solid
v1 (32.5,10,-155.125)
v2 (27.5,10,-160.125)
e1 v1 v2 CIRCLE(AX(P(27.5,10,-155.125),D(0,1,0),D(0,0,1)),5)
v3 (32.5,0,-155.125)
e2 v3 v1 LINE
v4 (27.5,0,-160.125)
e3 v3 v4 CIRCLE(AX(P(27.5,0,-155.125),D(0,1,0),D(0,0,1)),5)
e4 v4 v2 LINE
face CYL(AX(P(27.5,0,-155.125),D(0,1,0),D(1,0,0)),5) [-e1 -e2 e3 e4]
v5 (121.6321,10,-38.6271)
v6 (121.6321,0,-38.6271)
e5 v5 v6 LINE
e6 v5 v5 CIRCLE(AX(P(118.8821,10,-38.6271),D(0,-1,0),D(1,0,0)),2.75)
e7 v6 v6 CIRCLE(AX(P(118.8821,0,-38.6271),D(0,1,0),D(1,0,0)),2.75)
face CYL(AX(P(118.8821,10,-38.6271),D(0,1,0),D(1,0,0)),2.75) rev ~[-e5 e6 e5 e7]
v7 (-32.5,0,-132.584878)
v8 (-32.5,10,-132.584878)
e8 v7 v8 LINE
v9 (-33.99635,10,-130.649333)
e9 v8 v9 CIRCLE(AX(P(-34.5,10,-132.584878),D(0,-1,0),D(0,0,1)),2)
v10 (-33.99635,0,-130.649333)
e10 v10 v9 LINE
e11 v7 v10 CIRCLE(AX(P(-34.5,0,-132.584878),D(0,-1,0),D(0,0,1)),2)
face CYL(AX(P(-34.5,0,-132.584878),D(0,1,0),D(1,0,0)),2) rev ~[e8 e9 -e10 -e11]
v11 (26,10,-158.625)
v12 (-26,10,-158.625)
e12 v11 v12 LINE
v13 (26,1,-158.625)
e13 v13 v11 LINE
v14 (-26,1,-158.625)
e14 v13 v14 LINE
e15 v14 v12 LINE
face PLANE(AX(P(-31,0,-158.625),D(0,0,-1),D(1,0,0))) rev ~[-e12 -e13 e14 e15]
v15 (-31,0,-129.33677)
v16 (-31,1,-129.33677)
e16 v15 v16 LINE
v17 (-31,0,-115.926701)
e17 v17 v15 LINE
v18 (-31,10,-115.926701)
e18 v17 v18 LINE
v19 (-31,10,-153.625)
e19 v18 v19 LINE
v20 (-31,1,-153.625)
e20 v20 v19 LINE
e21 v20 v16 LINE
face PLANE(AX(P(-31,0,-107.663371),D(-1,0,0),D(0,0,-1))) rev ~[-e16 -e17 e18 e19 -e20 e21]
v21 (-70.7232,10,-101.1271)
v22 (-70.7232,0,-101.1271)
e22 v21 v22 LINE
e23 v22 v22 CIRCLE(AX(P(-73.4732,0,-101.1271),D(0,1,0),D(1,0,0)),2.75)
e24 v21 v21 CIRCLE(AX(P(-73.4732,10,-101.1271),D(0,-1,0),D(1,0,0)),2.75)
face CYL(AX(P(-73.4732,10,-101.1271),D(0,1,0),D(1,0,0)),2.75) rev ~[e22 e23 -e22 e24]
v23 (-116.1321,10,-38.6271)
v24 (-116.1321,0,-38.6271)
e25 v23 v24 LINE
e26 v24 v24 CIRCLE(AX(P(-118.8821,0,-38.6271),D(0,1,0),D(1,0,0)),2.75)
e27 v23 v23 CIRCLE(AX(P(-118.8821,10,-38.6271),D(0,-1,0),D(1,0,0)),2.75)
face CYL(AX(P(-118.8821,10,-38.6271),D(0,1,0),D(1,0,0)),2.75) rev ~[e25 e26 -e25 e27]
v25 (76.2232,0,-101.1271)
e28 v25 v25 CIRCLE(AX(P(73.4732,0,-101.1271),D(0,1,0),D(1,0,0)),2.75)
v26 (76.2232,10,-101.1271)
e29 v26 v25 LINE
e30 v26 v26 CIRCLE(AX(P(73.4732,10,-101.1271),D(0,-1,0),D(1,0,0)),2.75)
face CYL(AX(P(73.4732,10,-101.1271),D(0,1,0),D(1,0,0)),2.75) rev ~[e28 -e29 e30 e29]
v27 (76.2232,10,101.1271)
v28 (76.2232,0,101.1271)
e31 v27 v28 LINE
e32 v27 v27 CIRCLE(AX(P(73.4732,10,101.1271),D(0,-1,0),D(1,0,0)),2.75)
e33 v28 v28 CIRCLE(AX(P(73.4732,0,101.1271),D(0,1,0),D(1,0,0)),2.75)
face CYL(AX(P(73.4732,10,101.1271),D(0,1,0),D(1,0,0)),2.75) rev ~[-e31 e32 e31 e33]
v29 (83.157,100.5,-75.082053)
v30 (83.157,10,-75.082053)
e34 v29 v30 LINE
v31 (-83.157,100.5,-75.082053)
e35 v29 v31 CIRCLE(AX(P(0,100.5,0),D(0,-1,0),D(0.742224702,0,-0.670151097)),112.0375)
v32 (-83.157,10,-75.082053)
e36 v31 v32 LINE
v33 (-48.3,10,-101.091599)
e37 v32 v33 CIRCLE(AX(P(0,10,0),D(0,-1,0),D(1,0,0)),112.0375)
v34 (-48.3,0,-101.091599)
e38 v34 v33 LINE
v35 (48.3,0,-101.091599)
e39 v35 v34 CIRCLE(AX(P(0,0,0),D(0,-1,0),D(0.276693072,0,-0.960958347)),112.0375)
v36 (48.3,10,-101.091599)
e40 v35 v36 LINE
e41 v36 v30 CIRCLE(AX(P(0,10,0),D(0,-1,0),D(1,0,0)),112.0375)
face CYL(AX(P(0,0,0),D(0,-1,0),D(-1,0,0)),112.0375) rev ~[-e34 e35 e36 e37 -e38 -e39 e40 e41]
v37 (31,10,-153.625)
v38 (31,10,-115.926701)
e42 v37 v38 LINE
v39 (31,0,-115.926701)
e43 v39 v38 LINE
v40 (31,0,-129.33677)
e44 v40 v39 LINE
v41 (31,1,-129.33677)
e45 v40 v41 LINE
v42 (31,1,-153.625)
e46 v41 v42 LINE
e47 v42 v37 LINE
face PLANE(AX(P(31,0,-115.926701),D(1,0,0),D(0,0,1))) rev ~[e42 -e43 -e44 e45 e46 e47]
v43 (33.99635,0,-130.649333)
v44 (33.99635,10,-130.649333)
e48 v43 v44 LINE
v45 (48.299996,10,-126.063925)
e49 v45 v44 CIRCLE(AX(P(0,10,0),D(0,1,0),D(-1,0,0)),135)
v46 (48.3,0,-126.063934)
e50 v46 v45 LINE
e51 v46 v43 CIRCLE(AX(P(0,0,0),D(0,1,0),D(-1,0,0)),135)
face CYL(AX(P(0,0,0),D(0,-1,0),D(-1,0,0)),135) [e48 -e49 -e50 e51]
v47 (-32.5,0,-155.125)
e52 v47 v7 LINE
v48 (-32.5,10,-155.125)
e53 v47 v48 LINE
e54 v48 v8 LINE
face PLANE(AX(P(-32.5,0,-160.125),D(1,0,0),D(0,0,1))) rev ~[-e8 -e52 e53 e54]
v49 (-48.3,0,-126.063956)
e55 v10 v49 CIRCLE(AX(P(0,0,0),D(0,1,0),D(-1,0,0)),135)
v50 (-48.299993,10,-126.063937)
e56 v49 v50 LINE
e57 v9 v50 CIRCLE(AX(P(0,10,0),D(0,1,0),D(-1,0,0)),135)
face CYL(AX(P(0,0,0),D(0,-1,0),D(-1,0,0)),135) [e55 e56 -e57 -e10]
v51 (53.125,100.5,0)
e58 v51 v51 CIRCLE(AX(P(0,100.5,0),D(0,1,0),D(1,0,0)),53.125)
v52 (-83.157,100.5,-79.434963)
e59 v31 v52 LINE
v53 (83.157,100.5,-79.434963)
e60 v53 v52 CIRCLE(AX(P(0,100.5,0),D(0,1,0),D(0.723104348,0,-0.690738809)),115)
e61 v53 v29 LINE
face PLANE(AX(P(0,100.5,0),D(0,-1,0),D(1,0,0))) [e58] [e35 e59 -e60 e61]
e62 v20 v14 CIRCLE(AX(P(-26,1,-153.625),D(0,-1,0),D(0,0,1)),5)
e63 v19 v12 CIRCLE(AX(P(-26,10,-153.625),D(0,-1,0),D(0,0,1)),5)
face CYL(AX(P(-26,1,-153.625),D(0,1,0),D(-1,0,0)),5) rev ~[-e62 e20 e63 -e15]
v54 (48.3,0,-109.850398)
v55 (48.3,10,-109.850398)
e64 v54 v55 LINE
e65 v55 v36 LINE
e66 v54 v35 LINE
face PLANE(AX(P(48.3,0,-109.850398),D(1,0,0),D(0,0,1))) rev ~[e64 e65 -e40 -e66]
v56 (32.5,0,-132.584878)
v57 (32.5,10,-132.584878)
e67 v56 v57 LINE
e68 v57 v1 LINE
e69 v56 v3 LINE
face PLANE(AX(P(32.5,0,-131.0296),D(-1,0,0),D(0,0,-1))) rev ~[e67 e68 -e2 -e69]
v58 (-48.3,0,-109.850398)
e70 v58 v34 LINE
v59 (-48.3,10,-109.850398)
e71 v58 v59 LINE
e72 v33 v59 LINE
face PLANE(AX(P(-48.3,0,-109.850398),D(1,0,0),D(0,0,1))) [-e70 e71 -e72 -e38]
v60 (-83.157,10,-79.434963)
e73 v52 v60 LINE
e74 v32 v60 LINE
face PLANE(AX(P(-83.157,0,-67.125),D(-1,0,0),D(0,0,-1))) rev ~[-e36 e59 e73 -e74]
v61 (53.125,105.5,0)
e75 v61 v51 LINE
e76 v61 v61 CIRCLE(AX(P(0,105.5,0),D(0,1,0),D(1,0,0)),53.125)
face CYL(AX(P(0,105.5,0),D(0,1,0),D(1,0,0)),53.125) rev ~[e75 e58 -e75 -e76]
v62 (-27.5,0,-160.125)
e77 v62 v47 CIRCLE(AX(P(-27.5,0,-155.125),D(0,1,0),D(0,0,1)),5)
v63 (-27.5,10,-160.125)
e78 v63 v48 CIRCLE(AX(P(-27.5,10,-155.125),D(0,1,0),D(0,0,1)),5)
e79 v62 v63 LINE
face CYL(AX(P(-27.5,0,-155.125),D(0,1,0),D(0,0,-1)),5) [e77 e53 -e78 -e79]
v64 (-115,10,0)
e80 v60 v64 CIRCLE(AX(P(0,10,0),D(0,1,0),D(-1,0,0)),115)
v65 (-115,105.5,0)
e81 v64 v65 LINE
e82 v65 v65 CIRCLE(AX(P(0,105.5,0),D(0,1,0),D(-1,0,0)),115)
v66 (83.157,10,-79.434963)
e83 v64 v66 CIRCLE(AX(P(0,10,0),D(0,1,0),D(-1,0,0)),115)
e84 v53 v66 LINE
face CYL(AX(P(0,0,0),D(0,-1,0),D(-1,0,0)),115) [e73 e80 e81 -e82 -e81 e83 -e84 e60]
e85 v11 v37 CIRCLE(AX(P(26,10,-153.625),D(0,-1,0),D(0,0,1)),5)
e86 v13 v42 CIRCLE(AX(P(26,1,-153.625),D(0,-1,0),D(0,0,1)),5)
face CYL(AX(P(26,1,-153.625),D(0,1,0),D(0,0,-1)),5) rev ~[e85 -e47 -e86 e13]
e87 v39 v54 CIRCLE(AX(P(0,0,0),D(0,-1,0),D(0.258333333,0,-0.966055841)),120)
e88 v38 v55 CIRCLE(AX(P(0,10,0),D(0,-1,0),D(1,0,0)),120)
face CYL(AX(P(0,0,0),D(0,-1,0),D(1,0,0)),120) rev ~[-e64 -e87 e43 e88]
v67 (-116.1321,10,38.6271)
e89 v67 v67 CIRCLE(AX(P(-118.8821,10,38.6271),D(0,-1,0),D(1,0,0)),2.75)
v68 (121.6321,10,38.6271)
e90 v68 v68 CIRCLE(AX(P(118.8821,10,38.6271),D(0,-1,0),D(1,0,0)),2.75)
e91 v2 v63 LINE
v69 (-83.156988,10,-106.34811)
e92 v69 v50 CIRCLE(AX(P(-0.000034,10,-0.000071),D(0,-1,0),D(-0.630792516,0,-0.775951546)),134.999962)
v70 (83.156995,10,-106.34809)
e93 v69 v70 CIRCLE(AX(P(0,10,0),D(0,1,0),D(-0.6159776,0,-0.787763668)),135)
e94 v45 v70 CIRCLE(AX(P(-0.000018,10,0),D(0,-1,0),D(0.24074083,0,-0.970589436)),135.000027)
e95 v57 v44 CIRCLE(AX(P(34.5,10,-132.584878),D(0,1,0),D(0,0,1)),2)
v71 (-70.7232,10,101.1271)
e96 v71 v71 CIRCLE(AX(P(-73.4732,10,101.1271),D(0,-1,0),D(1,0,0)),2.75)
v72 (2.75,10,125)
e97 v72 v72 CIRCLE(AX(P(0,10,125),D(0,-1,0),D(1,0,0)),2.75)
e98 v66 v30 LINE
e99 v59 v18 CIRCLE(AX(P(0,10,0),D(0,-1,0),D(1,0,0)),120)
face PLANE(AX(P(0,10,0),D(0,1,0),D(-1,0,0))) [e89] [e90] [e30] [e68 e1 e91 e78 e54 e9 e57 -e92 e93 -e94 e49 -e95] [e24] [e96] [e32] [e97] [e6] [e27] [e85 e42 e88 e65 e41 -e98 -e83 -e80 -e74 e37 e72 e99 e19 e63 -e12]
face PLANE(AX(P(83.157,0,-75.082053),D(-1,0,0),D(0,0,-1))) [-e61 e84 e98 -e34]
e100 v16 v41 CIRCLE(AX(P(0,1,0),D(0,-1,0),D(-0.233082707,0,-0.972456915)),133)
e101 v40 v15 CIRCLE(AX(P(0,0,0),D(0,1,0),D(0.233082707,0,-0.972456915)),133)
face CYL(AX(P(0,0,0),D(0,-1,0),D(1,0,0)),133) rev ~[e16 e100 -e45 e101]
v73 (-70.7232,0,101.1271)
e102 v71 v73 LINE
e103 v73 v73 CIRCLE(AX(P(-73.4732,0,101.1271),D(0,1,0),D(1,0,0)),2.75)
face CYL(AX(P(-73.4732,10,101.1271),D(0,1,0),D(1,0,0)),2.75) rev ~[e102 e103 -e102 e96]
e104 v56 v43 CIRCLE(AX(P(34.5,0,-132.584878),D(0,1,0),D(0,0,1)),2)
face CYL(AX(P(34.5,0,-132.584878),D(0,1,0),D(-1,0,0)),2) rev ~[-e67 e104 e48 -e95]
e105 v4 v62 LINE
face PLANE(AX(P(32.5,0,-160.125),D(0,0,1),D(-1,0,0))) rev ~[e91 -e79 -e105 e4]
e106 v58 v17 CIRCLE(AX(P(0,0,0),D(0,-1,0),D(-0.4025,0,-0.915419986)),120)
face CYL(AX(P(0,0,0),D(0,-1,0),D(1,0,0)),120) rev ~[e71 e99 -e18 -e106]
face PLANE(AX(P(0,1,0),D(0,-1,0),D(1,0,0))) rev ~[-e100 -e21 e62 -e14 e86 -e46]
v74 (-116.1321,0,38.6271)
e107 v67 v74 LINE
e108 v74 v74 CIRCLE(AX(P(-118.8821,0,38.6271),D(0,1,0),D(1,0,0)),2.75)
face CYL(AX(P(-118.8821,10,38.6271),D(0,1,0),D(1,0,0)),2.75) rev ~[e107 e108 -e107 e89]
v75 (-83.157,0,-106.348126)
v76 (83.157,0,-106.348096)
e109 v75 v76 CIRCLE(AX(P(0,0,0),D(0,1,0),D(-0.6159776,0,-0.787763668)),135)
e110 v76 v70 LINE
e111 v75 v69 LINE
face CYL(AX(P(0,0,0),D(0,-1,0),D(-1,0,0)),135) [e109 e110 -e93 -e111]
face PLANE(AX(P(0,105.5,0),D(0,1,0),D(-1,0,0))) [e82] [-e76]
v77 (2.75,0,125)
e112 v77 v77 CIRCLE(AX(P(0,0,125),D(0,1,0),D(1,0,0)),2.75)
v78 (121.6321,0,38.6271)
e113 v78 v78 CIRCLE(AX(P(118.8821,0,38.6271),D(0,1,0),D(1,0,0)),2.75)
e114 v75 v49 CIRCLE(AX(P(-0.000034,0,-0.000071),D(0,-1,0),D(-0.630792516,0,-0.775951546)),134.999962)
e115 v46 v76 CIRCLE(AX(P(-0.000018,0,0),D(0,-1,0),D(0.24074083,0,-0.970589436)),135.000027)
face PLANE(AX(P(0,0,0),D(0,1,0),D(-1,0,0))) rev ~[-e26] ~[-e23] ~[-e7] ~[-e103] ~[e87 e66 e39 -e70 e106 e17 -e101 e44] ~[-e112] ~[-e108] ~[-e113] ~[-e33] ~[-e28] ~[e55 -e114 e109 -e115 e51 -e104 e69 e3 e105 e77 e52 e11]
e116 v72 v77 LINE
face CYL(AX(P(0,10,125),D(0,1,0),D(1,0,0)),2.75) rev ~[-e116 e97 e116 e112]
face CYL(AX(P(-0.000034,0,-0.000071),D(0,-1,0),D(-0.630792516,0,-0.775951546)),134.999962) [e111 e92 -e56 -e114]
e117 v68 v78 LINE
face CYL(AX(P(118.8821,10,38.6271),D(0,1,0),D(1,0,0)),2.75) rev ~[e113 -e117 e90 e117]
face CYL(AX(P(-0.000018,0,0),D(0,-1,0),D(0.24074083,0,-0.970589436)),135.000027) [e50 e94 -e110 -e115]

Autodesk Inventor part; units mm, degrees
ref_plane "YZ Plane" through (0, 0, 0) normal (1, 0, 0) x (0, 1, 0)
ref_plane "XZ Plane" through (0, 0, 0) normal (0, 1, 0) x (-1, 0, 0)
ref_plane "XY Plane" through (0, 0, 0) normal (0, 0, 1) x (1, 0, 0)
sketch "Sketch1" plane through (0, 0, 0) normal (0, 1, 0) x (-1, 0, 0)
  circle A0 centre (0, 0) radius 135
  circle A1 centre (0, 0) radius 115
  circle A2 centre (0, 0) radius 112.0375
  circle A3 centre (0, 0) radius 9.5
  dimension "Absolute_Diameter" = 270
  dimension "Diameter_No_Outer_Lip" = 230
  dimension "Inner_Cylinder_Diameter" = 224.075
  dimension "Lip_Diameter" = 19
extrude "Extrusion1" add sketch "Sketch1" along normal blind 10 contours A0
extrude "Extrusion2" add sketch "Sketch1" along normal blind 105.5 contours A1
sketch "Sketch2" plane through (0, 105.5, 0) normal (0, 1, 0) x (1, 0, 0)
  circle A0 centre (0, 0) radius 115
  circle A1 centre (0, 0) radius 53.125
  dimension "Lip_Diameter_Out" = 230
  dimension "Inner_Lip_Diameter" = 106.25
extrude "Extrusion7" add sketch "Sketch2" against normal blind 5
sketch "Sketch24" plane through (0, 0, 0) normal (0, -1, 0) x (1, 0, 0)
  circle A0 centre (0, 0) radius 112.0375
  arc A1 (-85.157, -104.7535) -> (32.5, -131.0296) centre (0, 0) ccw
  circle A2 centre (0, 0) radius 133
  line L0 (-32.5, -70.125) -> (32.5, -70.125)
  line L1 (32.5, -70.125) -> (32.5, -160.125)
  line L2 (32.5, -160.125) -> (-32.5, -160.125)
  line L3 (-32.5, -160.125) -> (-32.5, -70.125)
  line L4 (-31, -158.625) -> (31, -158.625)
  line L5 (31, -158.625) -> (31, -71.625)
  line L6 (31, -71.625) -> (-31, -71.625)
  line L7 (-31, -71.625) -> (-31, -158.625)
  line L8 (-85.157, -65.125) -> (-46.3, -65.125)
  line L9 (-46.3, -65.125) -> (-46.3, -151.2985)
  line L10 (-46.3, -151.2985) -> (-85.157, -151.2985)
  line L11 (-85.157, -151.2985) -> (-85.157, -65.125)
  arc A3 (32.5, -131.0296) -> (-85.157, -104.7535) centre (0, 0) ccw
  line L12 (0, -71.625) -> (0, -158.625)
  line L13 (-83.157, -149.2985) -> (-48.3, -149.2985)
  line L14 (-48.3, -149.2985) -> (-48.3, -67.125)
  line L15 (-48.3, -67.125) -> (-83.157, -67.125)
  line L16 (-83.157, -67.125) -> (-83.157, -149.2985)
  line L17 (85.157, -65.125) -> (46.3, -65.125)
  line L18 (46.3, -65.125) -> (46.3, -151.2985)
  line L19 (46.3, -151.2985) -> (85.157, -151.2985)
  line L20 (85.157, -151.2985) -> (85.157, -65.125)
  line L21 (83.157, -149.2985) -> (48.3, -149.2985)
  line L22 (48.3, -149.2985) -> (48.3, -67.125)
  line L23 (48.3, -67.125) -> (83.157, -67.125)
  line L24 (83.157, -67.125) -> (83.157, -149.2985)
  circle A4 centre (0, 0) radius 120
  line L25 (-135, 0) -> (135, 0)
  point P0 (0, -135)
  point P1 (48.3, -126.0639)
  point P2 (83.157, -106.3481)
  point P3 (-31, -131.3925)
  point P4 (31, -131.3925)
  point P5 (-83.157, -106.3481)
  point P6 (-48.3, -126.0639)
  point P7 (46.3, -126.8121)
  point P8 (85.157, -104.7535)
  point P9 (-32.5, -131.0296)
  point P10 (-46.3, -126.8121)
  point P11 (48.3, -109.8504)
  point P12 (48.3, -101.0916)
  point P13 (31, -107.6634)
  point P14 (31, -115.9267)
  point P15 (-48.3, -109.8504)
  point P16 (-31, -115.9267)
  point P17 (-31, -107.6634)
  point P18 (-48.3, -101.0916)
  point P19 (83.157, -75.0821)
  point P20 (-83.157, -75.0821)
  point P21 (32.5, -115.5152)
  point P22 (-32.5, -115.5152)
  point P23 (31, -129.3368)
  point P24 (-31, -129.3368)
  dimension "d234" = 2
  dimension "d235" = 65
  dimension "d237" = 1.5
  dimension "d238" = 65.125
  dimension "d240" = 20.9625
  dimension "d241" = 270
  dimension "d242" = 70.125
  dimension "d243" = 13.8
  dimension "d244" = 38.857
  dimension "d247" = 2
  dimension "d248" = 90
  dimension "d253" = 240
extrude "Extrusion30" cut sketch "Sketch24" against normal up to surface (100.5 mm away) contours L24 A4 L22 A0 | A0 L22 L23 L24 | L16 L15 L14 A0 | A0 L14 A4 L16 | L24 A2 L22 A4 | A4 L14 A2 L16 | L24 A3 L22 A2 | A2 L14 A1 L16 | L5 A4 L12 A0 | A0 L12 L6 L5 | L7 L6 L12 A0 | A0 L12 A4 L7 | L5 A2 L12 A4 | A4 L12 A2 L7 | L5 A1 L12 A2 | A2 L12 A1 L7
extrude "Extrusion31" add sketch "Sketch24" against normal up to surface (10 mm away) contours L24 A4 L22 A0 | A0 L14 A4 L16 | L24 A2 L22 A4 | A4 L14 A2 L16 | L24 A3 L22 A2 | A2 L14 A1 L16 | L1 L2 L3 A1 L7 L4 L5
extrude "Extrusion32" cut sketch "Sketch24" against normal up to surface (100.5 mm away) contours L22 A4 L18 A0 | A0 L9 A4 L14 | L18 A4 L1 A0 | A0 L3 A4 L9 | L1 A4 L5 A0 | A0 L7 A4 L3
extrude "Extrusion35" add sketch "Sketch24" against normal blind 1 contours L1 A2 L5 A4 | A4 L7 A2 L3 | L1 A1 L5 A2 | A2 L7 A1 L3 | L5 A1 L12 A2 | L1 L2 L3 A1 L7 L4 L5 | A2 L12 A1 L7 | L5 L4 L12 A1 | A1 L12 L4 L7
fillet "Fillet19" radius 5 4 edges at (32.5, 0.5, -160.125) (31, 5.5, -158.625) (-32.5, 0.5, -160.125) (-31, 5.5, -158.625)
fillet "Fillet20" radius 2 4 edges at (-32.5, 5.5, -131.0296) (-32.5, 0.5, -131.0296) (32.5, 5.5, -131.0296) (32.5, 0.5, -131.0296)
sketch "Sketch27" plane through (0, 10, 0) normal (0, 1, 0) x (1, 0, 0)
  circle A0 centre (0, 0) radius 125
  circle A1 centre (0, 125) radius 2.75
  circle A2 centre (-73.4732, 101.1271) radius 2.75
  circle A3 centre (-118.8821, 38.6271) radius 2.75
  circle A4 centre (-118.8821, -38.6271) radius 2.75
  circle A5 centre (-73.4732, -101.1271) radius 2.75
  circle A6 centre (0, -125) radius 2.75
  circle A7 centre (73.4732, -101.1271) radius 2.75
  circle A8 centre (118.8821, -38.6271) radius 2.75
  circle A9 centre (118.8821, 38.6271) radius 2.75
  circle A10 centre (73.4732, 101.1271) radius 2.75
  dimension "d276" = 250
  dimension "d277" = 5.5
  dimension "d280" = 360
extrude "Extrusion36" cut sketch "Sketch27" against normal blind 10 contours A9 A0 | A0 A9 | A8 A0 | A0 A8 | A10 A0 | A0 A10 | A7 A0 | A0 A7 | A1 A0 | A0 A1 | A6 A0 | A0 A6 | A2 A0 | A0 A2 | A5 A0 | A0 A5 | A3 A0 | A0 A3 | A4 A0 | A0 A4
properties part number "Cylinder  Segment - 01"
